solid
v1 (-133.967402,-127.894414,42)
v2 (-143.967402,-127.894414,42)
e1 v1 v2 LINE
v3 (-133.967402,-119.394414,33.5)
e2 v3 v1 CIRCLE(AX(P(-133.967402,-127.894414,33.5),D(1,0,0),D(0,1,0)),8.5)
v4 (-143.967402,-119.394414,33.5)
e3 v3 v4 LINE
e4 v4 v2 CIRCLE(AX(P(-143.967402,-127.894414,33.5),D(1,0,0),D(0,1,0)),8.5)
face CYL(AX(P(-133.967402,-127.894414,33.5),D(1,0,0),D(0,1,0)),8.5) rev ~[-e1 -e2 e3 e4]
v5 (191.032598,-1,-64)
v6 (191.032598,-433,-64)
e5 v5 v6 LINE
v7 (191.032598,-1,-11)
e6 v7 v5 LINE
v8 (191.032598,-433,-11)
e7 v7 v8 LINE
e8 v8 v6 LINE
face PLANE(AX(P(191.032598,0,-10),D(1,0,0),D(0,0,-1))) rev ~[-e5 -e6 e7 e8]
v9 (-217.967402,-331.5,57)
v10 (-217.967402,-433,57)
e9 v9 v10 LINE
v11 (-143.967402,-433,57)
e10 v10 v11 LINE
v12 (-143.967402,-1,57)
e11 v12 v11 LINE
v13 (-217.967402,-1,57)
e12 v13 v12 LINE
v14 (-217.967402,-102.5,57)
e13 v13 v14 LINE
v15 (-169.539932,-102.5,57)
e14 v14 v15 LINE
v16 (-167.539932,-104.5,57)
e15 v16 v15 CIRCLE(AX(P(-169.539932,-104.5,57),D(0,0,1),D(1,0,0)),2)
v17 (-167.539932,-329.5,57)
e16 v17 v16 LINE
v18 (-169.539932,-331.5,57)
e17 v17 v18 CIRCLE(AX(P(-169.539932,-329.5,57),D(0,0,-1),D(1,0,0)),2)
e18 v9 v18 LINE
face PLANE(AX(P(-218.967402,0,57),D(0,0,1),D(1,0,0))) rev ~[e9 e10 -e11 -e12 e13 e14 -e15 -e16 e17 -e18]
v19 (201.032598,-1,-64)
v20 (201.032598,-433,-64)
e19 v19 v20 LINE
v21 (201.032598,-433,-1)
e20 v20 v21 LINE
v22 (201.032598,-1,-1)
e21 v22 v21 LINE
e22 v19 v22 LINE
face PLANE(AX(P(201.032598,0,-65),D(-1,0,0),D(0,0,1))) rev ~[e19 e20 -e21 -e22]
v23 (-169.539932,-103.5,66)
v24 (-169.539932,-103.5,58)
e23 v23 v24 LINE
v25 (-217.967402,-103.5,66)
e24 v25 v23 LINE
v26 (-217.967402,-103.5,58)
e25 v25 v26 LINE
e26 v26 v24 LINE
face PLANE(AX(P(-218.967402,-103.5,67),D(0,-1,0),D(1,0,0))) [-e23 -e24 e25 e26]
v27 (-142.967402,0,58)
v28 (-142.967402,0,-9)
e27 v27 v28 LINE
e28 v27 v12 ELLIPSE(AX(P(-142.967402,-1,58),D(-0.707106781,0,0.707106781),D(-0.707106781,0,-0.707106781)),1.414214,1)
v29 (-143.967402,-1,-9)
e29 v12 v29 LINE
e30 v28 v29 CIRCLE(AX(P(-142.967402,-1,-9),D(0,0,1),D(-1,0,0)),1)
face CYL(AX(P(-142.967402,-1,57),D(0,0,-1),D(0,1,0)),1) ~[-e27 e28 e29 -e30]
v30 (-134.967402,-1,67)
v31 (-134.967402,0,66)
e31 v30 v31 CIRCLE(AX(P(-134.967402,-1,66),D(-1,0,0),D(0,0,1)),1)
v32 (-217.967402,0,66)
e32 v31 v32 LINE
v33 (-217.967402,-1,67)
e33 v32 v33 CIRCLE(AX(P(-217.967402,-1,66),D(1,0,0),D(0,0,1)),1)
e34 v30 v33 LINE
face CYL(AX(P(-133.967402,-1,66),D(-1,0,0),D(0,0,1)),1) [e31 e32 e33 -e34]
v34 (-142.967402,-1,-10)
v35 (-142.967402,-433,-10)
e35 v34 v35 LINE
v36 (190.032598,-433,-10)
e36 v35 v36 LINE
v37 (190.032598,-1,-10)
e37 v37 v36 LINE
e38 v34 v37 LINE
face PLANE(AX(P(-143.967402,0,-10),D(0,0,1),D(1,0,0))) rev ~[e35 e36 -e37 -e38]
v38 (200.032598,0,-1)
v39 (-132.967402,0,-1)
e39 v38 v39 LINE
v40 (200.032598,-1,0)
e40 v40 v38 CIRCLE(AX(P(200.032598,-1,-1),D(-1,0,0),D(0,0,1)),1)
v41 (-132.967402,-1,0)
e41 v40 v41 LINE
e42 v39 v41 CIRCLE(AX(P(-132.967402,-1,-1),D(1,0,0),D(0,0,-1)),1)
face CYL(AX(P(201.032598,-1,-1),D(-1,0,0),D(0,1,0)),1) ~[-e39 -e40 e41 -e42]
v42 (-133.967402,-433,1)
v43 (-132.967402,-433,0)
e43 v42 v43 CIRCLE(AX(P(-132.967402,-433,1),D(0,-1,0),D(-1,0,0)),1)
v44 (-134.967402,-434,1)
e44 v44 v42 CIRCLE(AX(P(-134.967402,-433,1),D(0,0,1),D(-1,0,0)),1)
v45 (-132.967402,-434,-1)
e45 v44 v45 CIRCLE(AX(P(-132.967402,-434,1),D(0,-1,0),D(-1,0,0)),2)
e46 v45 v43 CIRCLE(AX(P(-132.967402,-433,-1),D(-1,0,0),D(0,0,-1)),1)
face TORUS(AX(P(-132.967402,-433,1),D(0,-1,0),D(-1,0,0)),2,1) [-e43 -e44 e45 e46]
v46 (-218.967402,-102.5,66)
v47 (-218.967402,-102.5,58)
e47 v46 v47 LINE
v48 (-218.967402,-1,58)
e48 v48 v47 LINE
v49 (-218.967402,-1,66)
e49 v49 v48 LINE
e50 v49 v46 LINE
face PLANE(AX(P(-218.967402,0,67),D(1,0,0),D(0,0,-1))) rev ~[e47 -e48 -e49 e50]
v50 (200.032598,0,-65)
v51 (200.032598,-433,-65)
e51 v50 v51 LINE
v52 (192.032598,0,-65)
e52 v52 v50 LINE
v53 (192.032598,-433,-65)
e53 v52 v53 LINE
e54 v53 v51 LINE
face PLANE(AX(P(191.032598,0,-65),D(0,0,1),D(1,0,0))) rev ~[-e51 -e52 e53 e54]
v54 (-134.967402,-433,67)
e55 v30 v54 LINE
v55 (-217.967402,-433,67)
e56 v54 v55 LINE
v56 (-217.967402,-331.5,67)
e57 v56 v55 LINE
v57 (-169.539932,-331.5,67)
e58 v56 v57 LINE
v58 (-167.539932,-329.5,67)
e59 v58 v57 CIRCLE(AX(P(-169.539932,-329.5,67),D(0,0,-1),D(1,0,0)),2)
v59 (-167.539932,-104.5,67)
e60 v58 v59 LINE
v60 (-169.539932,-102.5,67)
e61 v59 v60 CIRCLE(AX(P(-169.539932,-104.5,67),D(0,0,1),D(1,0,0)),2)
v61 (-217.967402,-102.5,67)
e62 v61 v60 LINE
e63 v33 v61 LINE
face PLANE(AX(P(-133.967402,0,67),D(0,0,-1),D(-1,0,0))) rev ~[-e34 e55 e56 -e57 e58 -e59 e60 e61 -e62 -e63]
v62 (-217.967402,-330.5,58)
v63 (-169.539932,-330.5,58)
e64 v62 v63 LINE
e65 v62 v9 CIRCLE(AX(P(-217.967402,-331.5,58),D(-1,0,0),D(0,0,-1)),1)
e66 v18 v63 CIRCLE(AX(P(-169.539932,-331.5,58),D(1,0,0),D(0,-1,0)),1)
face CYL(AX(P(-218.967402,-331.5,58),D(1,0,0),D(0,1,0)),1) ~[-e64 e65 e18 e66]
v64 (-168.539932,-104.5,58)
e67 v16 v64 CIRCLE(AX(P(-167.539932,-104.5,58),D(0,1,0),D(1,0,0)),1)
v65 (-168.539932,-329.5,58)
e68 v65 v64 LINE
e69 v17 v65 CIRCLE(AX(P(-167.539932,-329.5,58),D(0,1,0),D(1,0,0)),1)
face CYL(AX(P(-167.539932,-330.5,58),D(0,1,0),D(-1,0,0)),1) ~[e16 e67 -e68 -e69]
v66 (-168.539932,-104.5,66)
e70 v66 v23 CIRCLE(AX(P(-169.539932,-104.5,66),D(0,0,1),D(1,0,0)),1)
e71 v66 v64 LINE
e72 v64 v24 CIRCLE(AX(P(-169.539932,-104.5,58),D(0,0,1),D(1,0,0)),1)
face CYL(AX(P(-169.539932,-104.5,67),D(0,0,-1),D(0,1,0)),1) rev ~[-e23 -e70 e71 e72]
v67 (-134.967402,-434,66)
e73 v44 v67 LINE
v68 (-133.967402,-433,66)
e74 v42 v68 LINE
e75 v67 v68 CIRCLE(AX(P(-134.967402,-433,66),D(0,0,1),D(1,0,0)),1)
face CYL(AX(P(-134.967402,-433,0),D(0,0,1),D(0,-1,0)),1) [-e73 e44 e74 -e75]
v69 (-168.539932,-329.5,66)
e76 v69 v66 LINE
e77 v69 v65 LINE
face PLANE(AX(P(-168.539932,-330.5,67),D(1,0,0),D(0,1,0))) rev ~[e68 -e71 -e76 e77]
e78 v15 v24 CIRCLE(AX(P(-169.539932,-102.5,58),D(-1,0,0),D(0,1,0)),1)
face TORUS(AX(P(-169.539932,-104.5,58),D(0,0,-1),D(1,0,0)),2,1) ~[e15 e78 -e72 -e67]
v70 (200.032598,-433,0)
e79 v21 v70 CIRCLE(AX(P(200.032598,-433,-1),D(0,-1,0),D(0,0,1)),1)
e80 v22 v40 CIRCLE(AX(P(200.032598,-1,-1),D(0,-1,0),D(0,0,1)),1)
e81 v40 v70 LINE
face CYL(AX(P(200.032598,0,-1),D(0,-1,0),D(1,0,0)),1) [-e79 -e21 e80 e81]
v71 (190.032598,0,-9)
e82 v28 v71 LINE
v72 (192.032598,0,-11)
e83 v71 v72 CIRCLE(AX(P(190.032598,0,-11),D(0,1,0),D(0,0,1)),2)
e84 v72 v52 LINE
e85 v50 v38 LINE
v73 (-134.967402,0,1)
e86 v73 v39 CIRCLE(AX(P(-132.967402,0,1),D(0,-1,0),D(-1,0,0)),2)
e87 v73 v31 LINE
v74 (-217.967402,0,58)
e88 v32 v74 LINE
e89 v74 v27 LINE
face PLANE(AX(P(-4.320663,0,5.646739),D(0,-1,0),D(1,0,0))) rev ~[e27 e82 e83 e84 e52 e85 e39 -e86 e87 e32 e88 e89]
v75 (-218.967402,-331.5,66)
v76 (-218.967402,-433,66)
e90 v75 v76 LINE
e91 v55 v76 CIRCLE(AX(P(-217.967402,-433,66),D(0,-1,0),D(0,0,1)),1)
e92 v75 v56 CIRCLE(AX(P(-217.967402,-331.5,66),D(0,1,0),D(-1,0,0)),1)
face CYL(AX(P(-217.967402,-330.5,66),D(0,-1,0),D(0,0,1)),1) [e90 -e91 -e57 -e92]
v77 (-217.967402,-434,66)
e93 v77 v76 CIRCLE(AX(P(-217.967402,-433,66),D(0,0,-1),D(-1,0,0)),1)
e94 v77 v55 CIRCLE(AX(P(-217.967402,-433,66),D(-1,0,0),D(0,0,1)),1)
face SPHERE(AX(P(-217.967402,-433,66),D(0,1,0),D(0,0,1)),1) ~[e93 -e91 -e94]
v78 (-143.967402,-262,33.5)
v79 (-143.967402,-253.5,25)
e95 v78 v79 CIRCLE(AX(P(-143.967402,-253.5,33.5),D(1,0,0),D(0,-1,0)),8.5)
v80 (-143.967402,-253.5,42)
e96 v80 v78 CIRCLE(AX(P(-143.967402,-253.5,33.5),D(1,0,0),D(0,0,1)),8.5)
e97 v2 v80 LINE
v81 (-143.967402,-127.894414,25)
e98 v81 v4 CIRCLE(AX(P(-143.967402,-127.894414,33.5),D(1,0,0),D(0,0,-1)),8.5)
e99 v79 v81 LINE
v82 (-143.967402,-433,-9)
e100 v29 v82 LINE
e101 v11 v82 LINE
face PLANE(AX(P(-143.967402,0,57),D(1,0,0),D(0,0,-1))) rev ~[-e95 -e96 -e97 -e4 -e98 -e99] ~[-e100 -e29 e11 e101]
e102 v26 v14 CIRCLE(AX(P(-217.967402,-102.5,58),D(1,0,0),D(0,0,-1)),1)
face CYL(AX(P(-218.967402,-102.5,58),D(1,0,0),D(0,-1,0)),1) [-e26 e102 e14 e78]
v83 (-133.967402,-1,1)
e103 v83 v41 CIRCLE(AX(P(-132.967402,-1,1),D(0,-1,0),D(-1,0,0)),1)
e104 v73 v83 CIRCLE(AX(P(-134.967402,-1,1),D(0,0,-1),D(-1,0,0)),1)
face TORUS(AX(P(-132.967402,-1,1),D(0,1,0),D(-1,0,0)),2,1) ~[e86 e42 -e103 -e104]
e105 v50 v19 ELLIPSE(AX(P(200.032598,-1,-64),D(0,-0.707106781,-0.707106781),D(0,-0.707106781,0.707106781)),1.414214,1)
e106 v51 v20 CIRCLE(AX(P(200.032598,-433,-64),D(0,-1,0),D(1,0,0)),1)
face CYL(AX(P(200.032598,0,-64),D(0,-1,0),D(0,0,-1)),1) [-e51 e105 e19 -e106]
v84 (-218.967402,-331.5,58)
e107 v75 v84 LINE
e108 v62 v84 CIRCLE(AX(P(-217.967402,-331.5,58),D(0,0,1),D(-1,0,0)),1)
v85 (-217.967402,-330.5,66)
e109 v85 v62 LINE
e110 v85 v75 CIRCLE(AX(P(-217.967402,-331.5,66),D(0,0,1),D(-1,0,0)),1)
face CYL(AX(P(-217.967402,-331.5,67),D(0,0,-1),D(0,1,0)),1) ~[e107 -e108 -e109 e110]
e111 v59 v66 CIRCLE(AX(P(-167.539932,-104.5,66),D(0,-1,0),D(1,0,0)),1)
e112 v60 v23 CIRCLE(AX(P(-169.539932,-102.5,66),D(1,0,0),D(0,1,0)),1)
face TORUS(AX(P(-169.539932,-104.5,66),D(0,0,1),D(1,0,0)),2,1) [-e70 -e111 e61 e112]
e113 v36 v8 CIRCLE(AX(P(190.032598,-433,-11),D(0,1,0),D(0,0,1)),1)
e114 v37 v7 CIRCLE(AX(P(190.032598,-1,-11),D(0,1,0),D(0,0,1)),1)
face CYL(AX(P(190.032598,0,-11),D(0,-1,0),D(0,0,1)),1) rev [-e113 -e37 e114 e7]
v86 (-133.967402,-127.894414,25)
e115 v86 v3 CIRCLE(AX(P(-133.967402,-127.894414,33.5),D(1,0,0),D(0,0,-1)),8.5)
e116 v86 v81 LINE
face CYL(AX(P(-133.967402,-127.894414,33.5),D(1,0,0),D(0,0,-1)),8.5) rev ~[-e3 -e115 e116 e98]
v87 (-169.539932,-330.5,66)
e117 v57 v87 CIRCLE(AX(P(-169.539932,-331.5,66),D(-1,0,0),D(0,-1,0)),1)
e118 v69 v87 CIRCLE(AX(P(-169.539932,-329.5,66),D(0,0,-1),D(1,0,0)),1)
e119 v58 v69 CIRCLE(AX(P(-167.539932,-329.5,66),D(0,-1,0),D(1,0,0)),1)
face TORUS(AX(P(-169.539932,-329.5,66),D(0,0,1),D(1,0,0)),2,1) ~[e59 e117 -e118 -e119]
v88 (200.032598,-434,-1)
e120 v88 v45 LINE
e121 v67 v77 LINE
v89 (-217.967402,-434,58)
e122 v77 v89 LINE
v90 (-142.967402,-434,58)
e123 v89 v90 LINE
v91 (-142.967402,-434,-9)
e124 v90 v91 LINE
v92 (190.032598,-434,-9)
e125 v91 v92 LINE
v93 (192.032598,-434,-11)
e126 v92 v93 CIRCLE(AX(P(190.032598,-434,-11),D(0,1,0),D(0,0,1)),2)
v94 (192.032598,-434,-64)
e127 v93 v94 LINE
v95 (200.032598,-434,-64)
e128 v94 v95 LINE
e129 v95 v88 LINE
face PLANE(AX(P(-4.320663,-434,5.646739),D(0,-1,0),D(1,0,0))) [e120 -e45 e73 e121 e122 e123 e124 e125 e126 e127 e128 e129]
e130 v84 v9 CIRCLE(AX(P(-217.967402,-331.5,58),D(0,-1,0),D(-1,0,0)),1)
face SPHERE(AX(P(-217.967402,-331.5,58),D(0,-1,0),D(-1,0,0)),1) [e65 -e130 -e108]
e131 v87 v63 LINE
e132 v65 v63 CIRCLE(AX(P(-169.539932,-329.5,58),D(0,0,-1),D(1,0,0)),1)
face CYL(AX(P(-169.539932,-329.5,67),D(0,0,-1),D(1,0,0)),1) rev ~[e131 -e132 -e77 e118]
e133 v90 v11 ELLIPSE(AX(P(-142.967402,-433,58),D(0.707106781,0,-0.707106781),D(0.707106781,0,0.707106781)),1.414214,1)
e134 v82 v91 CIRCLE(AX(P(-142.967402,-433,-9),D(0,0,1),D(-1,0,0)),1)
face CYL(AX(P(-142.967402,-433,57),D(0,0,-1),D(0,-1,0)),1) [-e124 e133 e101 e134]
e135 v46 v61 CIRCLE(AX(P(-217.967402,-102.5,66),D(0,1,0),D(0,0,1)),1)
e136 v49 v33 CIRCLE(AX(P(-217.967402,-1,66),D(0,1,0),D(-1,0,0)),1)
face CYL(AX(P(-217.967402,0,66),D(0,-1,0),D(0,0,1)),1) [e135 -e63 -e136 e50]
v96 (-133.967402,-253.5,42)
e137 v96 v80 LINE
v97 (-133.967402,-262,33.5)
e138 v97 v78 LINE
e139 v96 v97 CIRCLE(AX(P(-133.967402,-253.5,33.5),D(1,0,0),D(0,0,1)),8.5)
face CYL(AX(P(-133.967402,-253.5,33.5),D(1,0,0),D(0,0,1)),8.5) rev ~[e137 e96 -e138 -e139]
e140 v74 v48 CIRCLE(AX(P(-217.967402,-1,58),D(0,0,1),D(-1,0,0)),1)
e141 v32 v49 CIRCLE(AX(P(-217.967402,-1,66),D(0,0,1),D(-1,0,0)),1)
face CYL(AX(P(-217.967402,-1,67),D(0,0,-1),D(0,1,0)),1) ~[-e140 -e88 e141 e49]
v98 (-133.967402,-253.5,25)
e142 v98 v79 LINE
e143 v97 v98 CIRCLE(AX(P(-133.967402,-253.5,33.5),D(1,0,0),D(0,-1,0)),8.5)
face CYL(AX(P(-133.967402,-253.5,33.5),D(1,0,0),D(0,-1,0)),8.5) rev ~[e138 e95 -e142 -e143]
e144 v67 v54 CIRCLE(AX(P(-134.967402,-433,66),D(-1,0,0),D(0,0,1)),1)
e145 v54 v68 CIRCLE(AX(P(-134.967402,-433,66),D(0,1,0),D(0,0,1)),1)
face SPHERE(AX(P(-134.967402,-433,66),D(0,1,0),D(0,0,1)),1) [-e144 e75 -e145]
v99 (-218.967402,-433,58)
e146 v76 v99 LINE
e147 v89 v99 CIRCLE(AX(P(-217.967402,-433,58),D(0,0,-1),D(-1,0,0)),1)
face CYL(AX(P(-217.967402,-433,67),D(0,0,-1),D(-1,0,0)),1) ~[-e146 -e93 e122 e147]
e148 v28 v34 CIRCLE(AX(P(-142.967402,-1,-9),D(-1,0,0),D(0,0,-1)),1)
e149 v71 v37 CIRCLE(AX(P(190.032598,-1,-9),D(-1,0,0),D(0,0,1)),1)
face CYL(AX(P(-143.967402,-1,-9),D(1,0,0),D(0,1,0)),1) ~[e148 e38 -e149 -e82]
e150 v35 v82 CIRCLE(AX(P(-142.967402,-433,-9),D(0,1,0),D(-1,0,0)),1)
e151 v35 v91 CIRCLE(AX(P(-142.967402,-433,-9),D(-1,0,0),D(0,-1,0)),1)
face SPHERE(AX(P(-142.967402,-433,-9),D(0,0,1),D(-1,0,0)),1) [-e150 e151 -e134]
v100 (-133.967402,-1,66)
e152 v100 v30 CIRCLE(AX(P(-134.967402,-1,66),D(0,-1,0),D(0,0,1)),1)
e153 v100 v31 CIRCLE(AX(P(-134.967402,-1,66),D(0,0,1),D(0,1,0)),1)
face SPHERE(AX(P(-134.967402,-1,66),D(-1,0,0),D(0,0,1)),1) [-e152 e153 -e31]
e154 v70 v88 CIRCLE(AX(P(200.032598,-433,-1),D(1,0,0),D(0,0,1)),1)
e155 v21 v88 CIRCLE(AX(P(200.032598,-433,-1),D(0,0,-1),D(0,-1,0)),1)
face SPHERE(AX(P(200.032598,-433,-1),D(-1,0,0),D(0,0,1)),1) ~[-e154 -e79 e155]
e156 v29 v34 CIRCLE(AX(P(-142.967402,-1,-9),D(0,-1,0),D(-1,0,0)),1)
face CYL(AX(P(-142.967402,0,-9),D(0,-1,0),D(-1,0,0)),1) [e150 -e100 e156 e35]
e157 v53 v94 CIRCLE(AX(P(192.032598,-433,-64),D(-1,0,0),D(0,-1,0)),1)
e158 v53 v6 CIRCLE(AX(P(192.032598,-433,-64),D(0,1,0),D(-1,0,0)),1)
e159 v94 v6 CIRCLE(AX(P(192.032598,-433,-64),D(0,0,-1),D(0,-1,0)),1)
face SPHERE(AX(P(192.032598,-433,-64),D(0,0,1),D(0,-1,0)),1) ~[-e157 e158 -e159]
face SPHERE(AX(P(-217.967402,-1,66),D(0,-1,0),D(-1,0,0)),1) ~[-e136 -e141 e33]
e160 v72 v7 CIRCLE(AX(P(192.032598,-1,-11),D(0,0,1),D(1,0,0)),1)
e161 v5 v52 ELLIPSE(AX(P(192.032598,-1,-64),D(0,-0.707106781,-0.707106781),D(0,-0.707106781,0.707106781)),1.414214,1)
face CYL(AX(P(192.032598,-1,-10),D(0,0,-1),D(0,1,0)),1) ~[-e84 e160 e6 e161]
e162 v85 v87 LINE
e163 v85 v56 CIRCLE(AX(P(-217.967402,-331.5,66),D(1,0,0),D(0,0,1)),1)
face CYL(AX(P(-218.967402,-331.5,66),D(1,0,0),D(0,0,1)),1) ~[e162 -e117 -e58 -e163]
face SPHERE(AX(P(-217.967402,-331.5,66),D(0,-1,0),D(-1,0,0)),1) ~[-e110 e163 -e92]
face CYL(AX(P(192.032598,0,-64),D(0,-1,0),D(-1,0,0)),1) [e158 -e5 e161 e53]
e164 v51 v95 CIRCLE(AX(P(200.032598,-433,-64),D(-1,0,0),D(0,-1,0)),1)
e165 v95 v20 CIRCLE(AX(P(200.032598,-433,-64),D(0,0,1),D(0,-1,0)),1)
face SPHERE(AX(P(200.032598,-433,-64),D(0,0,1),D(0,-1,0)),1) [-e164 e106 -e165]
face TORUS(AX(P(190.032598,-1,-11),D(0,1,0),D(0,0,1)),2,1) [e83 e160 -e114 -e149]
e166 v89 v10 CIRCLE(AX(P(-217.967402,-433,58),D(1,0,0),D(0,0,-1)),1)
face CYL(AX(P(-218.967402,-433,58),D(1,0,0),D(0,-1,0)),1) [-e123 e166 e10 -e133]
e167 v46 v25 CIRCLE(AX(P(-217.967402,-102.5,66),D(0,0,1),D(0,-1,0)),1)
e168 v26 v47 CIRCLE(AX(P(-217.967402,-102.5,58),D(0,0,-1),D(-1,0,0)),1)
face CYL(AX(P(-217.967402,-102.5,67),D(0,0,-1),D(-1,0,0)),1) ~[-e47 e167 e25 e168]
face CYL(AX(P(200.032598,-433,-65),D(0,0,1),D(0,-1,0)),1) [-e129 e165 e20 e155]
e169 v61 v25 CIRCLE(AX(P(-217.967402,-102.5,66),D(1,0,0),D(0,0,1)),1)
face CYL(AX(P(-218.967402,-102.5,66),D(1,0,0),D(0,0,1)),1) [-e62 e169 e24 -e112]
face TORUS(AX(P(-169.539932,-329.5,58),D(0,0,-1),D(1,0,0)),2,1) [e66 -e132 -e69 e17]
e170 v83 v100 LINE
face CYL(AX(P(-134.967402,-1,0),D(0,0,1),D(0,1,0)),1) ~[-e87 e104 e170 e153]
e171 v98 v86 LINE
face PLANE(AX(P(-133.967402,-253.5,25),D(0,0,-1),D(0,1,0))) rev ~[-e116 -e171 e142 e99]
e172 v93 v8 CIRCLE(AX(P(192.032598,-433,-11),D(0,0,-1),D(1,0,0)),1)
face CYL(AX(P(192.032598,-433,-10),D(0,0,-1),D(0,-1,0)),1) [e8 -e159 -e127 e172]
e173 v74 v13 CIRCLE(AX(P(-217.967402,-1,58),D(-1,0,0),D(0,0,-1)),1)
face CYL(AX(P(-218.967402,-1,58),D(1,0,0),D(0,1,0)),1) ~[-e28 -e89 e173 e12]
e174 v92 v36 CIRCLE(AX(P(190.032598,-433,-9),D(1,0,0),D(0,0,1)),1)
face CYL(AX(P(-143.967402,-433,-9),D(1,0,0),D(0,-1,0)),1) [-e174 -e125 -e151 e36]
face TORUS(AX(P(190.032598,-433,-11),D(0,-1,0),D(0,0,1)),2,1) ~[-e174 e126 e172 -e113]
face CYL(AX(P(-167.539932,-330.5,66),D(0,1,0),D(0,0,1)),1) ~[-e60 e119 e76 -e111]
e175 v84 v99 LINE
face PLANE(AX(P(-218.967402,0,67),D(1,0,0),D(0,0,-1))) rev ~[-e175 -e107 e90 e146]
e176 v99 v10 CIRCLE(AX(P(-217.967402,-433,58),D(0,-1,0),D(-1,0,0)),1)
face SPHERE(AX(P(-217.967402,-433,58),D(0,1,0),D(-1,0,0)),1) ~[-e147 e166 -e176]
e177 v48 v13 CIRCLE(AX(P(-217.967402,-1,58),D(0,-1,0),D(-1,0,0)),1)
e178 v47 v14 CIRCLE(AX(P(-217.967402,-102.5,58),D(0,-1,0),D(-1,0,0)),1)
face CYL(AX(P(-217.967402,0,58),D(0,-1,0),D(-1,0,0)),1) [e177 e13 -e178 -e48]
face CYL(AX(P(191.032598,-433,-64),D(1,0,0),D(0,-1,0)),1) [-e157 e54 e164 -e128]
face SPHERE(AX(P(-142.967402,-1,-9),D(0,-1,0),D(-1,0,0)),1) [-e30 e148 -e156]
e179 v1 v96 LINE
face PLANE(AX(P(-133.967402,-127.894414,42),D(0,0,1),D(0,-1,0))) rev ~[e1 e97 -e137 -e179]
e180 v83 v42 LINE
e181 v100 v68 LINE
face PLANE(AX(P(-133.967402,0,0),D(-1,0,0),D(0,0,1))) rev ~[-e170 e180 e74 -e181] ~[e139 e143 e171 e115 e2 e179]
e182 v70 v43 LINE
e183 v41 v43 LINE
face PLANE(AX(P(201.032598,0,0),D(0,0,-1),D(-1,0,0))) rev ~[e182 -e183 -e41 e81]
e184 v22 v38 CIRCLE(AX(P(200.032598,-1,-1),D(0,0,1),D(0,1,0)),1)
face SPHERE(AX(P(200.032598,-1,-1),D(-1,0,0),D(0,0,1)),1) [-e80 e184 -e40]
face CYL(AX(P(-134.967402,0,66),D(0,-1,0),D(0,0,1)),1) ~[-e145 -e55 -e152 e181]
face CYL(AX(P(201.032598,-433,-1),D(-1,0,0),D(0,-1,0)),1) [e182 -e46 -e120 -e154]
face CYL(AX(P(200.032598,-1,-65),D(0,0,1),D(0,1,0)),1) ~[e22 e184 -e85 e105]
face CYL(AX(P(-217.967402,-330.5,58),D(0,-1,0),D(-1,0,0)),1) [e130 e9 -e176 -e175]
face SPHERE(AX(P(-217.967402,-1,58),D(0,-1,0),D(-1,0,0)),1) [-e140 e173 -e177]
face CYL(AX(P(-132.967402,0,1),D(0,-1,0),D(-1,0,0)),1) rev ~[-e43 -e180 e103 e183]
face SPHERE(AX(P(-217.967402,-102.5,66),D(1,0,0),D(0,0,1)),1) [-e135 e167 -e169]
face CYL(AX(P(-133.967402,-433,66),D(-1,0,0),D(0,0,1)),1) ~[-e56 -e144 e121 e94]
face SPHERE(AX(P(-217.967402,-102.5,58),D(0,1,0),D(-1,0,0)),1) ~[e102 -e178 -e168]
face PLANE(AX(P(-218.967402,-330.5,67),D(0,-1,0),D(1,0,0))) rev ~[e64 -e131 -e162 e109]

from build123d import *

# Parameters (mm, degrees)
F1_DEPTH = 434
F2_W     = 50.4274696951
F2_H     = 227
F3_DEPTH = 132.001
F5_DEPTH = 25.4
F6_R     = 1


with BuildPart() as f1:
    # F0 (on Front) → F1 (new body)
    with BuildSketch(Plane.XZ):
        Polygon((-133.9674020287, 67), (-218.9674020287, 67), (-218.9674020287, 57), (-143.9674020287, 57), (-143.9674020287, -10), (191.0325979713, -10), (191.0325979713, -65), (201.0325979713, -65), (201.0325979713, 0), (-133.9674020287, 0), align=None)
    extrude(amount=F1_DEPTH)

    # F2 (on face) → F3 (cut, through all)
    with BuildSketch(Plane.XY.offset(67)):
        with Locations((-193.7536671811, -217)):
            Rectangle(F2_W, F2_H)
    extrude(amount=-F3_DEPTH, mode=Mode.SUBTRACT)

    # F4 (on face) → F5 (cut)
    with BuildSketch(Plane.YZ.offset(-133.9674020287)):
        with BuildLine():
            Line((-127.8944141269, 42), (-253.5, 42))
            ThreePointArc((-253.5, 42), (-259.5104076401, 39.5104076401), (-262, 33.5))
            ThreePointArc((-262, 33.5), (-259.5104076401, 27.4895923599), (-253.5, 25))
            Line((-253.5, 25), (-127.8944141269, 25))
            ThreePointArc((-127.8944141269, 25), (-121.8840064868, 27.4895923599), (-119.3944141269, 33.5))
            ThreePointArc((-119.3944141269, 33.5), (-121.8840064868, 39.5104076401), (-127.8944141269, 42))
        make_face()
    extrude(amount=-F5_DEPTH, mode=Mode.SUBTRACT)

    # F6
    f6_edges = [f1.edges().sort_by_distance(p)[0] for p in [
        (-193.753667, -103.5, 67),
        (-168.539932, -103.5, 62),
        (-168.539932, -217, 57),
        (-168.539932, -217, 67),
        (-218.967402, -51.75, 67),
        (-218.967402, -51.75, 57),
        (-218.967402, -103.5, 62),
        (-218.967402, 0, 62),
        (-176.467402, 0, 67),
        (-133.967402, -217, 67),
        (-218.967402, -382.25, 67),
        (-218.967402, -382.25, 57),
        (-218.967402, -330.5, 62),
        (-193.753667, -330.5, 57),
        (-193.753667, -330.5, 67),
        (-168.539932, -330.5, 62),
        (-176.467402, -434, 67),
        (-218.967402, -434, 62),
        (-181.467402, -434, 57),
        (-143.967402, -434, 23.5),
        (-133.967402, -434, 33.5),
        (-143.967402, -217, -10),
        (-143.967402, 0, 23.5),
        (-133.967402, 0, 33.5),
        (33.532598, 0, 0),
        (23.532598, 0, -10),
        (-181.467402, 0, 57),
        (33.532598, -434, 0),
        (23.532598, -434, -10),
        (-133.967402, -217, 0),
        (201.032598, -217, 0),
        (201.032598, -434, -32.5),
        (191.032598, -434, -37.5),
        (196.032598, -434, -65),
        (201.032598, -217, -65),
        (191.032598, -217, -65),
        (201.032598, 0, -32.5),
        (191.032598, 0, -37.5),
        (191.032598, -217, -10),
        (-193.753667, -103.5, 57),
    ]]
    fillet(f6_edges, radius=F6_R)


solid = f1.part
